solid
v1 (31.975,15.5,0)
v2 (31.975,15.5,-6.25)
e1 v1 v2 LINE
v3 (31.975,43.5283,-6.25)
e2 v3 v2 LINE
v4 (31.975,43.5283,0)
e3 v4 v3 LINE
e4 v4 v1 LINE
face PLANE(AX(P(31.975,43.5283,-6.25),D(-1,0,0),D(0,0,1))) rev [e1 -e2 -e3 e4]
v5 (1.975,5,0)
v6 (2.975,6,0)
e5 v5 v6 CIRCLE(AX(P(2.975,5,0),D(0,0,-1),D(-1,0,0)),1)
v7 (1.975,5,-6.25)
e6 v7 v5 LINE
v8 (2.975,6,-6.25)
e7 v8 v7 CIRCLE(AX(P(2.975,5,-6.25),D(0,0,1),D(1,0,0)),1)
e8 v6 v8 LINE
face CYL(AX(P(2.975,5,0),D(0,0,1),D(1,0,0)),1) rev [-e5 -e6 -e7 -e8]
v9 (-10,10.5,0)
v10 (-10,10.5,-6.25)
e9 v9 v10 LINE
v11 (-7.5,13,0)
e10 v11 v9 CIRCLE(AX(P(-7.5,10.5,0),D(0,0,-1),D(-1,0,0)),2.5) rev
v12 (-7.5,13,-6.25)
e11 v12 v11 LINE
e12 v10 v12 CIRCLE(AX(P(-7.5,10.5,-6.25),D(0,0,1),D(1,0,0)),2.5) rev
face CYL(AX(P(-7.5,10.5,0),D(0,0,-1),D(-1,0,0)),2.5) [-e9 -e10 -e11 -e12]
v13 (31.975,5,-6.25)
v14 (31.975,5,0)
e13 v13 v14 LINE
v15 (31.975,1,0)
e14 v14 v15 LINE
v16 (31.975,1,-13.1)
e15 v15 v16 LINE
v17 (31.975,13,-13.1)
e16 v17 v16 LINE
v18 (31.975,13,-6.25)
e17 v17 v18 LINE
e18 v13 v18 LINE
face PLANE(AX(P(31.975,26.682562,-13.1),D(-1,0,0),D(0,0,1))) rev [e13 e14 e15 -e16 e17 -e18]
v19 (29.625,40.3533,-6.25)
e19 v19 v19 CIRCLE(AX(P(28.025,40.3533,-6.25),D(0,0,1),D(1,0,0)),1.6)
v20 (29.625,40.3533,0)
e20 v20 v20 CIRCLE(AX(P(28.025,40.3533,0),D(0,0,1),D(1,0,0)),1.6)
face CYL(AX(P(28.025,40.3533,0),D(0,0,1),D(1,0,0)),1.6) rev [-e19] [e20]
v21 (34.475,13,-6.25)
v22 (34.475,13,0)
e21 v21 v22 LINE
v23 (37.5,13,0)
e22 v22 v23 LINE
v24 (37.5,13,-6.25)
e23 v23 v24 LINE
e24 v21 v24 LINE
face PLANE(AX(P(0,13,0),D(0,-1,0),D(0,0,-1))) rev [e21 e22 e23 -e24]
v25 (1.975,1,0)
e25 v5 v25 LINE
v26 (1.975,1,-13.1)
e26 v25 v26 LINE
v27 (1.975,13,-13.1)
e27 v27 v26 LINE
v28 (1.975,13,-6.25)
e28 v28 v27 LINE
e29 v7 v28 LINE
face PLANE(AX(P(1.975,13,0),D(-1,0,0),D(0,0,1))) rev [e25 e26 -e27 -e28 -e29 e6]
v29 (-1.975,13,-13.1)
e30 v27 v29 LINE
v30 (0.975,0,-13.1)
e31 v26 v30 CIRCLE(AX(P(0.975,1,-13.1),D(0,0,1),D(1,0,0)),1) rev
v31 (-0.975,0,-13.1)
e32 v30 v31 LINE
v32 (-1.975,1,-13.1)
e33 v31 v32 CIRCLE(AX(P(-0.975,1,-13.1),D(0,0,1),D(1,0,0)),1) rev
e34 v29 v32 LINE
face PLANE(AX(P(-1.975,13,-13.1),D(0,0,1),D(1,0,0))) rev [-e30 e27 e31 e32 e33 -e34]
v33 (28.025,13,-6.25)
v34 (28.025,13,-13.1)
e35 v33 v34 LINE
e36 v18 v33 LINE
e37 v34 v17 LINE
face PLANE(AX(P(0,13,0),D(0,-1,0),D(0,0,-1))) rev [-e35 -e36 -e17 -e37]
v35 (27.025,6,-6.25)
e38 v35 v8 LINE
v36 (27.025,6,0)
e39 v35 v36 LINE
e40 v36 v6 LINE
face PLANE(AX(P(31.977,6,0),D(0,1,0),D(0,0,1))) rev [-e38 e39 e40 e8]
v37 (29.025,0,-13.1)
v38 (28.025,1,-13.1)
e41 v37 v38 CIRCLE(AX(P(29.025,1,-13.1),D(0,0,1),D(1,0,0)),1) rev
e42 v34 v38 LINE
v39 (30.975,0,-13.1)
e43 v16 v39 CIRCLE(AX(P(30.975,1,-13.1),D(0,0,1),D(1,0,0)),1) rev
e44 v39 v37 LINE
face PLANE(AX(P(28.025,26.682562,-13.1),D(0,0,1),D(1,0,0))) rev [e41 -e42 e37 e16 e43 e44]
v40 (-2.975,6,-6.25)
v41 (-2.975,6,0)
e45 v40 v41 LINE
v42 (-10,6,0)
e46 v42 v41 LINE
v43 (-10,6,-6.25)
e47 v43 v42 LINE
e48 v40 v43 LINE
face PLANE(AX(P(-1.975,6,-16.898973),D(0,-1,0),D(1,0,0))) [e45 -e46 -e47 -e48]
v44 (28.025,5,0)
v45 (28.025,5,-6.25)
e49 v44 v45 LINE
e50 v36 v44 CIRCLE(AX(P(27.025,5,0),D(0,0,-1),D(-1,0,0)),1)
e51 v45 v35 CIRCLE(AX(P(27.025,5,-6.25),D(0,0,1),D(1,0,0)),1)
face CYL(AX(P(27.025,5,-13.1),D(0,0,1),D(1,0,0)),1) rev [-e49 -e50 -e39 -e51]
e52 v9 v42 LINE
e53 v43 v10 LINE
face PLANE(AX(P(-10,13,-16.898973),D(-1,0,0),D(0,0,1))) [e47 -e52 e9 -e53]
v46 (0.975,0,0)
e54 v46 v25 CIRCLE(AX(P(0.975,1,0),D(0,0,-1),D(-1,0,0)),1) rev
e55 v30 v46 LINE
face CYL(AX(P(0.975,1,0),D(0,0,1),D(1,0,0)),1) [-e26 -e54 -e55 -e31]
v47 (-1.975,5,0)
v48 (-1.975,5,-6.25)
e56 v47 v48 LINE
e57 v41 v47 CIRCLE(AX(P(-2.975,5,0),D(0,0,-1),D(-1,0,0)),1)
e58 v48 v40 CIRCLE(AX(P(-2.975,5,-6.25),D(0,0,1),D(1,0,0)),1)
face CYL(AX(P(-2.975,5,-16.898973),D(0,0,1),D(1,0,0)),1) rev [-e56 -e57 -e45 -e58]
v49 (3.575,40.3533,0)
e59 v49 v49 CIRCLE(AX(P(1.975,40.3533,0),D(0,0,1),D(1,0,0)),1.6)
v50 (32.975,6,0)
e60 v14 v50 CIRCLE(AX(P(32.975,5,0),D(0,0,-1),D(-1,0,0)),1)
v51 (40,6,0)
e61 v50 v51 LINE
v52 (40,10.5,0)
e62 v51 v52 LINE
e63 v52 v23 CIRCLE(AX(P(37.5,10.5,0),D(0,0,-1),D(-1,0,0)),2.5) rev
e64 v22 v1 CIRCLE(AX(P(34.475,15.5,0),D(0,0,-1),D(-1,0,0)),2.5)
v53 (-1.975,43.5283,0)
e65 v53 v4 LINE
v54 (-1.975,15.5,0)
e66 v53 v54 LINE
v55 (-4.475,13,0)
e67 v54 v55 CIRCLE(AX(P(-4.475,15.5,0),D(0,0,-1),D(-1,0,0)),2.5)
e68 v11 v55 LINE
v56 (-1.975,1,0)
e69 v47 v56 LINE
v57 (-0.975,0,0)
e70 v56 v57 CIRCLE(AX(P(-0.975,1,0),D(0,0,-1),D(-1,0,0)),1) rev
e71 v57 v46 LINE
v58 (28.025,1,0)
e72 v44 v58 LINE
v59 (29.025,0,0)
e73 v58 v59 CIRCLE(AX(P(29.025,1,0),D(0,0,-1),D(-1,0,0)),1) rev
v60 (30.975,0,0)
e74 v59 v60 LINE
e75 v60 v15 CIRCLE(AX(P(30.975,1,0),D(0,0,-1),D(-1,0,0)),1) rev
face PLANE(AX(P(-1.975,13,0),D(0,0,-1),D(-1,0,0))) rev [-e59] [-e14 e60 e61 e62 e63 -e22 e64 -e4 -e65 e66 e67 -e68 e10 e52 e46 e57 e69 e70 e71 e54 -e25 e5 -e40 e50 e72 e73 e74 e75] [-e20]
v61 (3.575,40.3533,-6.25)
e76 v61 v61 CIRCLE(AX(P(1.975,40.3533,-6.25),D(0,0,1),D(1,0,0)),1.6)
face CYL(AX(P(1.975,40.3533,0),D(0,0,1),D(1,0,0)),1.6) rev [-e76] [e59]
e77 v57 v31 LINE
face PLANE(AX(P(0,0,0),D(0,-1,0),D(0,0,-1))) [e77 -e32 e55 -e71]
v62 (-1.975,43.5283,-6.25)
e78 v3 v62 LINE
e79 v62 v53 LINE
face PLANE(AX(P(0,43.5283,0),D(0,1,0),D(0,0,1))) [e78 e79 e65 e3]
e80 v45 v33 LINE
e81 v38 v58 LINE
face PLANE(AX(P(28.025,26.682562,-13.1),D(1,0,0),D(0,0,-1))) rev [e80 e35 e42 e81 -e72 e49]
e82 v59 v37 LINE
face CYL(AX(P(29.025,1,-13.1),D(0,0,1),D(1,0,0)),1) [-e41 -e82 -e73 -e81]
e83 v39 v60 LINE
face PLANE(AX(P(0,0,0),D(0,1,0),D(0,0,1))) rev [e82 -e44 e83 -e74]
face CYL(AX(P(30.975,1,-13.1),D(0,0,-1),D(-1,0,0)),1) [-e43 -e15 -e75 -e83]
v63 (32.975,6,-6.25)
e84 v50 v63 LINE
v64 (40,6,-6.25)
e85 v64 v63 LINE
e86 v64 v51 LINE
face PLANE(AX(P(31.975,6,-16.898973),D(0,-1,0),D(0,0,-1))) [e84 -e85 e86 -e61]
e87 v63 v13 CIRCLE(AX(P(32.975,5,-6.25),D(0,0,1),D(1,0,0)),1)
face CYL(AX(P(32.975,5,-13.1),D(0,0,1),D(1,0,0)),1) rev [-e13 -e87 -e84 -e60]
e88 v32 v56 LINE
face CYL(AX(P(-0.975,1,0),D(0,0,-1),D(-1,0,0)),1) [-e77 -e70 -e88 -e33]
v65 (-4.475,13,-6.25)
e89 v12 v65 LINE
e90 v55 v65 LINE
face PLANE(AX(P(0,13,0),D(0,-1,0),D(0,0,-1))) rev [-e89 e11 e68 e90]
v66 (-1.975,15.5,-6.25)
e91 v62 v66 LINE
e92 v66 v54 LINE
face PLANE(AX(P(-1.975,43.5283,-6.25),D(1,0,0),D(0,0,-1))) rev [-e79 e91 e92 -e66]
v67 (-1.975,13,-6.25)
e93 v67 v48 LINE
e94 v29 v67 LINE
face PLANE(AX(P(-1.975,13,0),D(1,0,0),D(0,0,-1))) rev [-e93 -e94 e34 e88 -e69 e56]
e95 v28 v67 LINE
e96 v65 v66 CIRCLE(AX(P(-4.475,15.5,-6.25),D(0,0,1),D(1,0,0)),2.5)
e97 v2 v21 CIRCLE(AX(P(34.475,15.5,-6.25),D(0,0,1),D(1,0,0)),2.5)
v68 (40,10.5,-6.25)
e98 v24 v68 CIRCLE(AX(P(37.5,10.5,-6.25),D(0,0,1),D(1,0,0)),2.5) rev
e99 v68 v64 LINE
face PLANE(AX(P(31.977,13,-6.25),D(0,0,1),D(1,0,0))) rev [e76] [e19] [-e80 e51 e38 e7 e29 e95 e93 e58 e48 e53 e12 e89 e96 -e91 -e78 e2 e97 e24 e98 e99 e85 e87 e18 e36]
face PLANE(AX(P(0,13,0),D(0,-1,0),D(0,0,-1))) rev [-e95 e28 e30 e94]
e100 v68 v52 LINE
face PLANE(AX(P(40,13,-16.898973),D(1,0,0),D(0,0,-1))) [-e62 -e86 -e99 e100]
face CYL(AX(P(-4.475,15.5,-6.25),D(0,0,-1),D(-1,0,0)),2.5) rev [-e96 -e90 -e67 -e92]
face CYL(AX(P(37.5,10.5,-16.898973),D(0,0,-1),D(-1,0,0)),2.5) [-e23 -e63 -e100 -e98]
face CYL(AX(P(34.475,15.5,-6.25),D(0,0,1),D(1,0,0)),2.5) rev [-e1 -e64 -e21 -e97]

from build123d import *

# Parameters (mm, degrees)
SKETCH1_W                  = 3.95
SKETCH1_H                  = 13.1
BOSS_EXTRUDE1_DEPTH        = 13
SKETCH2_W                  = 3.95
SKETCH2_H                  = 13.1
BOSS_EXTRUDE2_DEPTH        = 13
BOSS_EXTRUDE3_REACH        = 37.222
SKETCH3_W                  = 6.25
SKETCH3_H                  = 7
SKETCH10_W                 = 8.025
SKETCH10_H                 = 7
BOSS_EXTRUDE7_DEPTH        = 6.25
FILLET7_R                  = 1
SKETCH11_W                 = 33.95
SKETCH11_H                 = 6.25
BOSS_EXTRUDE8_DEPTH        = 30.5283
F_3_2_3_2_DIAMETER_HOLE1_D = 3.2
FILLET8_START              = -7
FILLET8_DEPTH              = 8
FILLET8_START_2            = -6.25
FILLET8_2_DEPTH            = 6.25
FILLET9_R                  = 1


with BuildPart() as part:
    # Sketch1 → Boss-Extrude1 (new body)
    with BuildSketch(Plane(origin=(0, 0, 0), x_dir=(1, 0, 0), z_dir=(0, 1, 0))):
        with Locations((0, 6.55)):
            Rectangle(SKETCH1_W, SKETCH1_H)
    extrude(amount=BOSS_EXTRUDE1_DEPTH)


with BuildPart() as body_2:
    # Sketch2 → Boss-Extrude2 (new body)
    with BuildSketch(Plane(origin=(0, 0, 0), x_dir=(1, 0, 0), z_dir=(0, 1, 0))):
        with Locations((30, 6.55)):
            Rectangle(SKETCH2_W, SKETCH2_H)
    extrude(amount=BOSS_EXTRUDE2_DEPTH)

    # Sketch3 → Boss-Extrude3 (add, up to next)
    with BuildSketch(Plane(origin=(1.975, 0, 0), x_dir=(0, 0, -1), z_dir=(1, 0, 0)), mode=Mode.PRIVATE) as boss_extrude3_sk1:
        with Locations((3.125, 9.5)):
            Rectangle(SKETCH3_W, SKETCH3_H)
    boss_extrude3_tool1 = extrude(boss_extrude3_sk1.sketch, amount=BOSS_EXTRUDE3_REACH, mode=Mode.PRIVATE) - body_2.part

    add(part.part)  # Boss-Extrude3 merges part
    add(boss_extrude3_tool1.solids().sort_by_distance((1.975, 9.5, -3.125))[0])

    # Sketch10 → Boss-Extrude7 (add)
    with BuildSketch(Plane.XY):
        with Locations((-5.9875, 9.5)):
            Rectangle(SKETCH10_W, SKETCH10_H)
        with Locations((35.9875, 9.5)):
            Rectangle(SKETCH10_W, SKETCH10_H)
    extrude(amount=-BOSS_EXTRUDE7_DEPTH)

    # Fillet7
    fillet7_edges = [body_2.edges().sort_by_distance(p)[0] for p in [
        (28.025, 0, -6.55),
        (31.975, 0, -6.55),
        (1.975, 0, -6.55),
        (-1.975, 0, -6.55),
    ]]
    fillet(fillet7_edges, radius=FILLET7_R)

    # Sketch11 → Boss-Extrude8 (add)
    with BuildSketch(Plane(origin=(0, 13, 0), x_dir=(1, 0, 0), z_dir=(0, 1, 0))):
        with Locations((15, 3.125)):
            Rectangle(SKETCH11_W, SKETCH11_H)
    extrude(amount=BOSS_EXTRUDE8_DEPTH)

    # Ø3.2 (3.2) Diameter Hole1 (through all)
    with Locations(Plane.XY):
        with Locations((28.025, 40.3533), (1.975, 40.3533)):
            Hole(F_3_2_3_2_DIAMETER_HOLE1_D / 2)

    # Fillet8: read off the stored shape, not the designer's step
    # Fillet8 outline → Fillet8 (cut)
    with BuildSketch(Plane.XY.offset(FILLET8_START)):
        with BuildLine():
            Line((40, 13), (37.5, 13))
            ThreePointArc((37.5, 13), (39.267766953, 12.267766953), (40, 10.5))
            Line((40, 10.5), (40, 13))
        make_face()
        with BuildLine():
            Line((-10, 13), (-10, 10.5))
            ThreePointArc((-10, 10.5), (-9.267766953, 12.267766953), (-7.5, 13))
            Line((-7.5, 13), (-10, 13))
        make_face()
    extrude(amount=FILLET8_DEPTH, mode=Mode.SUBTRACT)

    # Fillet8 2 outline → Fillet8 2 (add)
    with BuildSketch(Plane.XY.offset(FILLET8_START_2)):
        with BuildLine():
            Line((31.975, 13), (34.475, 13))
            ThreePointArc((34.475, 13), (32.707233047, 13.732233047), (31.975, 15.5))
            Line((31.975, 15.5), (31.975, 13))
        make_face()
        with BuildLine():
            ThreePointArc((-1.975, 15.5), (-2.707233047, 13.732233047), (-4.475, 13))
            Line((-4.475, 13), (-1.975, 13))
            Line((-1.975, 13), (-1.975, 15.5))
        make_face()
    extrude(amount=FILLET8_2_DEPTH)

    # Fillet9
    fillet9_edges = [body_2.edges().sort_by_distance(p)[0] for p in [
        (28.025, 6, -3.125),
        (1.975, 6, -3.125),
        (-1.975, 6, -3.125),
        (31.975, 6, -3.125),
    ]]
    fillet(fillet9_edges, radius=FILLET9_R)


solid = body_2.part
